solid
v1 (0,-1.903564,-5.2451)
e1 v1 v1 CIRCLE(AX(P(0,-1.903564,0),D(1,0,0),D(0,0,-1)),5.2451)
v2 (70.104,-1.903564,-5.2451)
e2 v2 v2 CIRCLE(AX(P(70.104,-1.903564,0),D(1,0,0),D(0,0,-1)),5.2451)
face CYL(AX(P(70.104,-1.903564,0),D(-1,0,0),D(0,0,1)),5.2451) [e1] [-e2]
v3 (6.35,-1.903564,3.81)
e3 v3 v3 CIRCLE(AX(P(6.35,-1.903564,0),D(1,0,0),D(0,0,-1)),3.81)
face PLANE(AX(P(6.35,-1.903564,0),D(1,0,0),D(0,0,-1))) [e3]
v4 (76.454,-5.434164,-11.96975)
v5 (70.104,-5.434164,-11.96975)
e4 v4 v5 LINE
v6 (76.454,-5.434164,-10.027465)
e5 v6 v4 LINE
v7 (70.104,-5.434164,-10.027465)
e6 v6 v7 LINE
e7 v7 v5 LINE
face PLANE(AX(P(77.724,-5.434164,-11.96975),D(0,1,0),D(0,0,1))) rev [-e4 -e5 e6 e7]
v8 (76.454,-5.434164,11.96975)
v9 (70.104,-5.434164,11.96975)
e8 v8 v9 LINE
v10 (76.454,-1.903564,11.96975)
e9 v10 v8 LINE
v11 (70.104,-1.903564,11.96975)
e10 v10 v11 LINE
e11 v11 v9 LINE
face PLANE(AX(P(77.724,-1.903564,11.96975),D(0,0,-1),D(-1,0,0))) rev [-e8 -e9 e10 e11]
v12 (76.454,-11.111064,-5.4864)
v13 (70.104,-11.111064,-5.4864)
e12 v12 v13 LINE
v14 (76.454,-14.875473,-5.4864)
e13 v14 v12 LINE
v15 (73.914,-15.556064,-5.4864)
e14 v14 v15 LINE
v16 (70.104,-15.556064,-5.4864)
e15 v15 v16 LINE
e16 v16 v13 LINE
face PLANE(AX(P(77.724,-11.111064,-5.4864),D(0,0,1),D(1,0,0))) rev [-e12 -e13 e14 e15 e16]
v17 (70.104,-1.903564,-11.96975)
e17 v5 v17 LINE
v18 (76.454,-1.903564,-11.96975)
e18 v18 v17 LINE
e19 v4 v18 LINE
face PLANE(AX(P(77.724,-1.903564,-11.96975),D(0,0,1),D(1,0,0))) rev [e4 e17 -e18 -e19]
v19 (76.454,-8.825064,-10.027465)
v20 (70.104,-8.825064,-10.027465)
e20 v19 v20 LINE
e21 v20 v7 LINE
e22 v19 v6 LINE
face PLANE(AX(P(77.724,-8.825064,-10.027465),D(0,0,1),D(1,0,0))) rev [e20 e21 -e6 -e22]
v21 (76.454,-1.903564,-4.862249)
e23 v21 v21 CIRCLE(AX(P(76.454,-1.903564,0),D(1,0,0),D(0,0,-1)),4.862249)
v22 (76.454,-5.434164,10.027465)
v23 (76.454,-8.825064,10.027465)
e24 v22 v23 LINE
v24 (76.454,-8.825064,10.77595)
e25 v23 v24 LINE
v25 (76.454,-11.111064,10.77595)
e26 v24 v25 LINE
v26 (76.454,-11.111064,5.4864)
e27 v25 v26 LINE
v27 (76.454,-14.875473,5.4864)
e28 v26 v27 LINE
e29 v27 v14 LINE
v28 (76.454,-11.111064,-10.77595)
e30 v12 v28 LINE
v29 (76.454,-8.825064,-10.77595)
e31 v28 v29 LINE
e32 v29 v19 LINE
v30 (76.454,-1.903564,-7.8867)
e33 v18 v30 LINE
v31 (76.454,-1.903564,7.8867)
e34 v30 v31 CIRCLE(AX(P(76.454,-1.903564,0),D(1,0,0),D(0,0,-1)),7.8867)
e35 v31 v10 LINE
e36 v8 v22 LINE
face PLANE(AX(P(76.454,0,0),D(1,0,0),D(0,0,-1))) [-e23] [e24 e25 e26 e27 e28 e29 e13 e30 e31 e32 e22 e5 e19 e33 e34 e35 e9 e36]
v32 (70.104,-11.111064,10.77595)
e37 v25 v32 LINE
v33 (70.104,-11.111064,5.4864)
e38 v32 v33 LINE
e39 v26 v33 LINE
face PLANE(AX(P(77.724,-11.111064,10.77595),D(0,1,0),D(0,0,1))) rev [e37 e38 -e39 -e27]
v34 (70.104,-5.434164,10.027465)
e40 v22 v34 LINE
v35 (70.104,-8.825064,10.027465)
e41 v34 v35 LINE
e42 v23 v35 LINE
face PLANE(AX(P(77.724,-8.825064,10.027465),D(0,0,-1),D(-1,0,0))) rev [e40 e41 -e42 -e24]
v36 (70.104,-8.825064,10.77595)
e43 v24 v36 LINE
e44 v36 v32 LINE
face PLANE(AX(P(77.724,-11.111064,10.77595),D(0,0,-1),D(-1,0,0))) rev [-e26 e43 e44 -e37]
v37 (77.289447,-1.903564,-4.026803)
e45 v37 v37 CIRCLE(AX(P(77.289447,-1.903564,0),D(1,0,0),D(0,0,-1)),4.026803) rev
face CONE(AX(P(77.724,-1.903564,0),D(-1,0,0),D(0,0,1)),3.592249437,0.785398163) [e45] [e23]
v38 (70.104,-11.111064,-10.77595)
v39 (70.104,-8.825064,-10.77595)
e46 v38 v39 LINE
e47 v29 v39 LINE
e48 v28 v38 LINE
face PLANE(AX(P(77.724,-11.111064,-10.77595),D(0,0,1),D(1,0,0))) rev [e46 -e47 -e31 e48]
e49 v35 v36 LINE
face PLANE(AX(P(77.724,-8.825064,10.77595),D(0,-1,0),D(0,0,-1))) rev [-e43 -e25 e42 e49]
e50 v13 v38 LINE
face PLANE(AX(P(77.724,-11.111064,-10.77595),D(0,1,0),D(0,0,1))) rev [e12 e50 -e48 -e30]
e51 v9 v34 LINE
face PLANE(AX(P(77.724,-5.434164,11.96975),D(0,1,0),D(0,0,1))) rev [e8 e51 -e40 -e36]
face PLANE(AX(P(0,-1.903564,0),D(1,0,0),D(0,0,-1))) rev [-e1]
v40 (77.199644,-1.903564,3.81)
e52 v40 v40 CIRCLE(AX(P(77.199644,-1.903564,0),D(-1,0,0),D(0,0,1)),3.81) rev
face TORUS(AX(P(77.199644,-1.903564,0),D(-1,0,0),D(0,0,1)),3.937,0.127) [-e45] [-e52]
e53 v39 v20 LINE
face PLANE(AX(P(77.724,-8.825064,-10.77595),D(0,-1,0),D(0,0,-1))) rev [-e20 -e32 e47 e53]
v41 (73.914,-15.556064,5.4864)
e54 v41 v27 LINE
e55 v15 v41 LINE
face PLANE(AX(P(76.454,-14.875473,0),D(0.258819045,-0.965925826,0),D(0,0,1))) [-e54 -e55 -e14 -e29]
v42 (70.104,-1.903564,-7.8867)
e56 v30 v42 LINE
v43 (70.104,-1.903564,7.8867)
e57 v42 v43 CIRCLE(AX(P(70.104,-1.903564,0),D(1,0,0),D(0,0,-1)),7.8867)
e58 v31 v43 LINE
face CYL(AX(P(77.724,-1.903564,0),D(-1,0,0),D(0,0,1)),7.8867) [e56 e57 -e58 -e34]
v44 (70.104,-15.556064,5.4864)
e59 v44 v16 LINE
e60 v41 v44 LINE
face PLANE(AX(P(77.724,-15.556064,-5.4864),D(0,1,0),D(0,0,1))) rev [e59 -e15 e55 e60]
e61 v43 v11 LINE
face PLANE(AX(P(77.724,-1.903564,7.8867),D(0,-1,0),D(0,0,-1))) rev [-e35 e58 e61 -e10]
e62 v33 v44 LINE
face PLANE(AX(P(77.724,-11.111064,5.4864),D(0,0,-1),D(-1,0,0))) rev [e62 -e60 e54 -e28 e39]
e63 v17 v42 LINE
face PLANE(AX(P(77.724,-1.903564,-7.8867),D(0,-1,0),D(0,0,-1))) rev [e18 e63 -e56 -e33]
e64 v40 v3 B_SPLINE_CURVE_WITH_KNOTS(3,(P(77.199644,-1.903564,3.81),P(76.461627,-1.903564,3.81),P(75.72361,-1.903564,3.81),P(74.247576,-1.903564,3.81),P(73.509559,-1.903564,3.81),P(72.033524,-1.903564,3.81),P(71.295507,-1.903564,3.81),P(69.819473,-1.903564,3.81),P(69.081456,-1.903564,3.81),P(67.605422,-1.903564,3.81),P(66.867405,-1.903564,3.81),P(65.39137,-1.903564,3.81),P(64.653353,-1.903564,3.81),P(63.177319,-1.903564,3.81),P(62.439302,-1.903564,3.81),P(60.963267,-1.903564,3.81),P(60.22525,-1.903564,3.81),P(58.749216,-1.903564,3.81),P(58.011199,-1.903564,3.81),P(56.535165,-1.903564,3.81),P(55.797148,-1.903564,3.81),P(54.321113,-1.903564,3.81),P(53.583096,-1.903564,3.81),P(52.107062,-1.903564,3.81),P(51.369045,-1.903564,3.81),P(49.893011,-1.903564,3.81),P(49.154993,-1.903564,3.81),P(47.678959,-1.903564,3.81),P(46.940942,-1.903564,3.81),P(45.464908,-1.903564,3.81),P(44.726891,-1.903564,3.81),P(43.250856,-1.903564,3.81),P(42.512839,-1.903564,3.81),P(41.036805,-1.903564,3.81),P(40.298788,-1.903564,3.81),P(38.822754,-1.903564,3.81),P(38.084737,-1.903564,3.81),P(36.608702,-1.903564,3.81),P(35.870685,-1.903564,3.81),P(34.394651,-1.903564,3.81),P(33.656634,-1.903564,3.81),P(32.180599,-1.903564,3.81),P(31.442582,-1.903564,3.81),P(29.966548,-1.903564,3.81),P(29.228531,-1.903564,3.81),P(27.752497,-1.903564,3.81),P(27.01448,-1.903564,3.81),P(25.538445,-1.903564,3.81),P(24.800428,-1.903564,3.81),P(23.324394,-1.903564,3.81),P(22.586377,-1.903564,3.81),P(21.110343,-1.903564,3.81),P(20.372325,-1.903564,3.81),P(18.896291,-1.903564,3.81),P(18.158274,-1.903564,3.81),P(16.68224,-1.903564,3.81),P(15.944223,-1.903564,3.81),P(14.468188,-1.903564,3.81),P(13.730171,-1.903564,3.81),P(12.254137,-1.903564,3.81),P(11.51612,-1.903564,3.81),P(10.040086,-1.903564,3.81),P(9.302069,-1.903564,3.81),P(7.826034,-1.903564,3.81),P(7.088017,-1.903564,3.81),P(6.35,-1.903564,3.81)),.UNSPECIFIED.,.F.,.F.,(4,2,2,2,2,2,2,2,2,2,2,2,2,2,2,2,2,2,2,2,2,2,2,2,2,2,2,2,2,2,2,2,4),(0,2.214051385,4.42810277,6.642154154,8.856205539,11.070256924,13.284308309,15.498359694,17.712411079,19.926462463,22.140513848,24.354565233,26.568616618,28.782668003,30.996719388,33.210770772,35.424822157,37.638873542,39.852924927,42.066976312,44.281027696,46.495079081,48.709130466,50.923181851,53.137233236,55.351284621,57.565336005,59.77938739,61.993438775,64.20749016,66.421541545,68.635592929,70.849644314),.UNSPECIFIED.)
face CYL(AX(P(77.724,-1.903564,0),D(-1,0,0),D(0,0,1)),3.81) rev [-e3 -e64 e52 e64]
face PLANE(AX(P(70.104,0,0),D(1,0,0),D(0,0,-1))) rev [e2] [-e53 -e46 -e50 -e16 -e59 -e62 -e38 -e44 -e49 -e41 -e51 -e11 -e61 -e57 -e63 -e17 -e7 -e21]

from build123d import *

# Parameters (mm, degrees)
SKETCH1_R           = 3.81
BOSS_EXTRUDE1_DEPTH = 77.724
SKETCH3_R           = 3.81
BOSS_EXTRUDE2_DEPTH = 6.35
SKETCH2_W           = 36.763821928
SKETCH2_H           = 29.567130372
SKETCH2_R           = 5.2451
CUT_EXTRUDE2_DEPTH  = 70.104
CUT_EXTRUDE3_START  = -1.27
SKETCH4_R           = 4.862249437
CUT_EXTRUDE3_DEPTH  = 1.27
CHAMFER1_SIZE       = 1.27
FILLET1_R           = 0.127
CHAMFER2_SIZE       = 2.54
CHAMFER2_SIZE2      = 0.680590949


with BuildPart() as part:
    # Sketch1 → Boss-Extrude1 (new body)
    with BuildSketch(Plane(origin=(0, 0, 0), x_dir=(0, 0, -1), z_dir=(1, 0, 0))):
        with BuildLine():
            Line((5.4864, -15.556063849), (-5.4864, -15.556063849))
            Line((-5.4864, -15.556063849), (-5.4864, -11.111063849))
            Line((-5.4864, -11.111063849), (-10.77595, -11.111063849))
            Line((-10.77595, -11.111063849), (-10.77595, -8.825063849))
            Line((-10.77595, -8.825063849), (-10.02746492, -8.825063849))
            Line((-10.02746492, -8.825063849), (-10.02746492, -5.434163849))
            Line((-10.02746492, -5.434163849), (-11.96975, -5.434163849))
            Line((-11.96975, -5.434163849), (-11.96975, -1.903563849))
            Line((-11.96975, -1.903563849), (-7.8867, -1.903563849))
            ThreePointArc((-7.8867, -1.903563849), (0, 5.983136151), (7.8867, -1.903563849))
            Line((7.8867, -1.903563849), (11.96975, -1.903563849))
            Line((11.96975, -1.903563849), (11.96975, -5.434163849))
            Line((11.96975, -5.434163849), (10.02746492, -5.434163849))
            Line((10.02746492, -5.434163849), (10.02746492, -8.825063849))
            Line((10.02746492, -8.825063849), (10.77595, -8.825063849))
            Line((10.77595, -8.825063849), (10.77595, -11.111063849))
            Line((10.77595, -11.111063849), (5.4864, -11.111063849))
            Line((5.4864, -11.111063849), (5.4864, -15.556063849))
        make_face()
        with Locations(Location((0, -1.903563849, 0), (0, 0, 180))):
            Circle(SKETCH1_R, mode=Mode.SUBTRACT)
    extrude(amount=BOSS_EXTRUDE1_DEPTH)

    # Sketch3 → Boss-Extrude2 (add)
    with BuildSketch(Plane(origin=(0, 0, 0), x_dir=(0, 0, -1), z_dir=(1, 0, 0))):
        with Locations(Location((0, -1.903563849, 0), (0, 0, 180))):
            Circle(SKETCH3_R)
    extrude(amount=BOSS_EXTRUDE2_DEPTH)

    # Sketch2 → Cut-Extrude2 (cut)
    with BuildSketch(Plane(origin=(0, 0, 0), x_dir=(0, 0, -1), z_dir=(1, 0, 0))):
        with Locations((-1.560728289, -3.789331886)):
            Rectangle(SKETCH2_W, SKETCH2_H)
        with Locations((0, -1.903563849)):
            Circle(SKETCH2_R, mode=Mode.SUBTRACT)
    extrude(amount=CUT_EXTRUDE2_DEPTH, mode=Mode.SUBTRACT)

    # Sketch4 → Cut-Extrude3 (cut)
    with BuildSketch(Plane(origin=(77.724, 0, 0), x_dir=(0, 0, -1), z_dir=(1, 0, 0)).offset(CUT_EXTRUDE3_START)):
        with BuildLine():
            Line((11.96975, -1.903563849), (7.8867, -1.903563849))
            ThreePointArc((7.8867, -1.903563849), (0, 5.983136151), (-7.8867, -1.903563849))
            Line((-7.8867, -1.903563849), (-11.96975, -1.903563849))
            Line((-11.96975, -1.903563849), (-11.96975, -5.434163849))
            Line((-11.96975, -5.434163849), (-10.02746492, -5.434163849))
            Line((-10.02746492, -5.434163849), (-10.02746492, -8.825063849))
            Line((-10.02746492, -8.825063849), (-10.77595, -8.825063849))
            Line((-10.77595, -8.825063849), (-10.77595, -11.111063849))
            Line((-10.77595, -11.111063849), (-5.4864, -11.111063849))
            Line((-5.4864, -11.111063849), (-5.4864, -15.556063849))
            Line((-5.4864, -15.556063849), (5.4864, -15.556063849))
            Line((5.4864, -15.556063849), (5.4864, -11.111063849))
            Line((5.4864, -11.111063849), (10.77595, -11.111063849))
            Line((10.77595, -11.111063849), (10.77595, -8.825063849))
            Line((10.77595, -8.825063849), (10.02746492, -8.825063849))
            Line((10.02746492, -8.825063849), (10.02746492, -5.434163849))
            Line((10.02746492, -5.434163849), (11.96975, -5.434163849))
            Line((11.96975, -5.434163849), (11.96975, -1.903563849))
        make_face()
        with Locations((0, -1.903563849)):
            Circle(SKETCH4_R, mode=Mode.SUBTRACT)
    extrude(amount=CUT_EXTRUDE3_DEPTH, mode=Mode.SUBTRACT)

    # Chamfer1
    # the kernel refuses this chamfer: 1.27 mm, written as the material it takes off along each edge
    with BuildSketch(Plane(origin=(77.724, -1.903563849, 0), x_dir=(0, 0, -1), z_dir=(0, -1, 0))) as chamfer1_piece_1_section:
        Polygon((4.862249437, -CHAMFER1_SIZE), (4.862249437 - CHAMFER1_SIZE, 0), (4.862249437, 0), align=None)
    chamfer1_piece_1 = revolve(axis=Axis((77.724, -1.903563849, 0), (1, 0, 0)), mode=Mode.PRIVATE)
    chamfer1_piece_1 = split(chamfer1_piece_1, bisect_by=Plane(origin=(76.454, -1.903563849, 4.22989024), z_dir=(1, 0, 0)), keep=Keep.TOP, mode=Mode.PRIVATE)
    add(chamfer1_piece_1, mode=Mode.SUBTRACT)

    # Fillet1
    fillet1_edges = [part.edges().sort_by_distance(p)[0] for p in [
        (77.506249437, 1.906436151, 0),
    ]]
    fillet(fillet1_edges, radius=FILLET1_R)

    # Chamfer2
    chamfer2_edges = [part.edges().sort_by_distance(p)[0] for p in [
        (76.454, -15.556063849, 0),
    ]]
    chamfer2_side = [part.faces().sort_by_distance(p)[0] for p in [
        (73.279, -15.556063849, 0),
    ]]
    chamfer(chamfer2_edges, length=CHAMFER2_SIZE, length2=CHAMFER2_SIZE2, reference=chamfer2_side[0])


solid = part.part
